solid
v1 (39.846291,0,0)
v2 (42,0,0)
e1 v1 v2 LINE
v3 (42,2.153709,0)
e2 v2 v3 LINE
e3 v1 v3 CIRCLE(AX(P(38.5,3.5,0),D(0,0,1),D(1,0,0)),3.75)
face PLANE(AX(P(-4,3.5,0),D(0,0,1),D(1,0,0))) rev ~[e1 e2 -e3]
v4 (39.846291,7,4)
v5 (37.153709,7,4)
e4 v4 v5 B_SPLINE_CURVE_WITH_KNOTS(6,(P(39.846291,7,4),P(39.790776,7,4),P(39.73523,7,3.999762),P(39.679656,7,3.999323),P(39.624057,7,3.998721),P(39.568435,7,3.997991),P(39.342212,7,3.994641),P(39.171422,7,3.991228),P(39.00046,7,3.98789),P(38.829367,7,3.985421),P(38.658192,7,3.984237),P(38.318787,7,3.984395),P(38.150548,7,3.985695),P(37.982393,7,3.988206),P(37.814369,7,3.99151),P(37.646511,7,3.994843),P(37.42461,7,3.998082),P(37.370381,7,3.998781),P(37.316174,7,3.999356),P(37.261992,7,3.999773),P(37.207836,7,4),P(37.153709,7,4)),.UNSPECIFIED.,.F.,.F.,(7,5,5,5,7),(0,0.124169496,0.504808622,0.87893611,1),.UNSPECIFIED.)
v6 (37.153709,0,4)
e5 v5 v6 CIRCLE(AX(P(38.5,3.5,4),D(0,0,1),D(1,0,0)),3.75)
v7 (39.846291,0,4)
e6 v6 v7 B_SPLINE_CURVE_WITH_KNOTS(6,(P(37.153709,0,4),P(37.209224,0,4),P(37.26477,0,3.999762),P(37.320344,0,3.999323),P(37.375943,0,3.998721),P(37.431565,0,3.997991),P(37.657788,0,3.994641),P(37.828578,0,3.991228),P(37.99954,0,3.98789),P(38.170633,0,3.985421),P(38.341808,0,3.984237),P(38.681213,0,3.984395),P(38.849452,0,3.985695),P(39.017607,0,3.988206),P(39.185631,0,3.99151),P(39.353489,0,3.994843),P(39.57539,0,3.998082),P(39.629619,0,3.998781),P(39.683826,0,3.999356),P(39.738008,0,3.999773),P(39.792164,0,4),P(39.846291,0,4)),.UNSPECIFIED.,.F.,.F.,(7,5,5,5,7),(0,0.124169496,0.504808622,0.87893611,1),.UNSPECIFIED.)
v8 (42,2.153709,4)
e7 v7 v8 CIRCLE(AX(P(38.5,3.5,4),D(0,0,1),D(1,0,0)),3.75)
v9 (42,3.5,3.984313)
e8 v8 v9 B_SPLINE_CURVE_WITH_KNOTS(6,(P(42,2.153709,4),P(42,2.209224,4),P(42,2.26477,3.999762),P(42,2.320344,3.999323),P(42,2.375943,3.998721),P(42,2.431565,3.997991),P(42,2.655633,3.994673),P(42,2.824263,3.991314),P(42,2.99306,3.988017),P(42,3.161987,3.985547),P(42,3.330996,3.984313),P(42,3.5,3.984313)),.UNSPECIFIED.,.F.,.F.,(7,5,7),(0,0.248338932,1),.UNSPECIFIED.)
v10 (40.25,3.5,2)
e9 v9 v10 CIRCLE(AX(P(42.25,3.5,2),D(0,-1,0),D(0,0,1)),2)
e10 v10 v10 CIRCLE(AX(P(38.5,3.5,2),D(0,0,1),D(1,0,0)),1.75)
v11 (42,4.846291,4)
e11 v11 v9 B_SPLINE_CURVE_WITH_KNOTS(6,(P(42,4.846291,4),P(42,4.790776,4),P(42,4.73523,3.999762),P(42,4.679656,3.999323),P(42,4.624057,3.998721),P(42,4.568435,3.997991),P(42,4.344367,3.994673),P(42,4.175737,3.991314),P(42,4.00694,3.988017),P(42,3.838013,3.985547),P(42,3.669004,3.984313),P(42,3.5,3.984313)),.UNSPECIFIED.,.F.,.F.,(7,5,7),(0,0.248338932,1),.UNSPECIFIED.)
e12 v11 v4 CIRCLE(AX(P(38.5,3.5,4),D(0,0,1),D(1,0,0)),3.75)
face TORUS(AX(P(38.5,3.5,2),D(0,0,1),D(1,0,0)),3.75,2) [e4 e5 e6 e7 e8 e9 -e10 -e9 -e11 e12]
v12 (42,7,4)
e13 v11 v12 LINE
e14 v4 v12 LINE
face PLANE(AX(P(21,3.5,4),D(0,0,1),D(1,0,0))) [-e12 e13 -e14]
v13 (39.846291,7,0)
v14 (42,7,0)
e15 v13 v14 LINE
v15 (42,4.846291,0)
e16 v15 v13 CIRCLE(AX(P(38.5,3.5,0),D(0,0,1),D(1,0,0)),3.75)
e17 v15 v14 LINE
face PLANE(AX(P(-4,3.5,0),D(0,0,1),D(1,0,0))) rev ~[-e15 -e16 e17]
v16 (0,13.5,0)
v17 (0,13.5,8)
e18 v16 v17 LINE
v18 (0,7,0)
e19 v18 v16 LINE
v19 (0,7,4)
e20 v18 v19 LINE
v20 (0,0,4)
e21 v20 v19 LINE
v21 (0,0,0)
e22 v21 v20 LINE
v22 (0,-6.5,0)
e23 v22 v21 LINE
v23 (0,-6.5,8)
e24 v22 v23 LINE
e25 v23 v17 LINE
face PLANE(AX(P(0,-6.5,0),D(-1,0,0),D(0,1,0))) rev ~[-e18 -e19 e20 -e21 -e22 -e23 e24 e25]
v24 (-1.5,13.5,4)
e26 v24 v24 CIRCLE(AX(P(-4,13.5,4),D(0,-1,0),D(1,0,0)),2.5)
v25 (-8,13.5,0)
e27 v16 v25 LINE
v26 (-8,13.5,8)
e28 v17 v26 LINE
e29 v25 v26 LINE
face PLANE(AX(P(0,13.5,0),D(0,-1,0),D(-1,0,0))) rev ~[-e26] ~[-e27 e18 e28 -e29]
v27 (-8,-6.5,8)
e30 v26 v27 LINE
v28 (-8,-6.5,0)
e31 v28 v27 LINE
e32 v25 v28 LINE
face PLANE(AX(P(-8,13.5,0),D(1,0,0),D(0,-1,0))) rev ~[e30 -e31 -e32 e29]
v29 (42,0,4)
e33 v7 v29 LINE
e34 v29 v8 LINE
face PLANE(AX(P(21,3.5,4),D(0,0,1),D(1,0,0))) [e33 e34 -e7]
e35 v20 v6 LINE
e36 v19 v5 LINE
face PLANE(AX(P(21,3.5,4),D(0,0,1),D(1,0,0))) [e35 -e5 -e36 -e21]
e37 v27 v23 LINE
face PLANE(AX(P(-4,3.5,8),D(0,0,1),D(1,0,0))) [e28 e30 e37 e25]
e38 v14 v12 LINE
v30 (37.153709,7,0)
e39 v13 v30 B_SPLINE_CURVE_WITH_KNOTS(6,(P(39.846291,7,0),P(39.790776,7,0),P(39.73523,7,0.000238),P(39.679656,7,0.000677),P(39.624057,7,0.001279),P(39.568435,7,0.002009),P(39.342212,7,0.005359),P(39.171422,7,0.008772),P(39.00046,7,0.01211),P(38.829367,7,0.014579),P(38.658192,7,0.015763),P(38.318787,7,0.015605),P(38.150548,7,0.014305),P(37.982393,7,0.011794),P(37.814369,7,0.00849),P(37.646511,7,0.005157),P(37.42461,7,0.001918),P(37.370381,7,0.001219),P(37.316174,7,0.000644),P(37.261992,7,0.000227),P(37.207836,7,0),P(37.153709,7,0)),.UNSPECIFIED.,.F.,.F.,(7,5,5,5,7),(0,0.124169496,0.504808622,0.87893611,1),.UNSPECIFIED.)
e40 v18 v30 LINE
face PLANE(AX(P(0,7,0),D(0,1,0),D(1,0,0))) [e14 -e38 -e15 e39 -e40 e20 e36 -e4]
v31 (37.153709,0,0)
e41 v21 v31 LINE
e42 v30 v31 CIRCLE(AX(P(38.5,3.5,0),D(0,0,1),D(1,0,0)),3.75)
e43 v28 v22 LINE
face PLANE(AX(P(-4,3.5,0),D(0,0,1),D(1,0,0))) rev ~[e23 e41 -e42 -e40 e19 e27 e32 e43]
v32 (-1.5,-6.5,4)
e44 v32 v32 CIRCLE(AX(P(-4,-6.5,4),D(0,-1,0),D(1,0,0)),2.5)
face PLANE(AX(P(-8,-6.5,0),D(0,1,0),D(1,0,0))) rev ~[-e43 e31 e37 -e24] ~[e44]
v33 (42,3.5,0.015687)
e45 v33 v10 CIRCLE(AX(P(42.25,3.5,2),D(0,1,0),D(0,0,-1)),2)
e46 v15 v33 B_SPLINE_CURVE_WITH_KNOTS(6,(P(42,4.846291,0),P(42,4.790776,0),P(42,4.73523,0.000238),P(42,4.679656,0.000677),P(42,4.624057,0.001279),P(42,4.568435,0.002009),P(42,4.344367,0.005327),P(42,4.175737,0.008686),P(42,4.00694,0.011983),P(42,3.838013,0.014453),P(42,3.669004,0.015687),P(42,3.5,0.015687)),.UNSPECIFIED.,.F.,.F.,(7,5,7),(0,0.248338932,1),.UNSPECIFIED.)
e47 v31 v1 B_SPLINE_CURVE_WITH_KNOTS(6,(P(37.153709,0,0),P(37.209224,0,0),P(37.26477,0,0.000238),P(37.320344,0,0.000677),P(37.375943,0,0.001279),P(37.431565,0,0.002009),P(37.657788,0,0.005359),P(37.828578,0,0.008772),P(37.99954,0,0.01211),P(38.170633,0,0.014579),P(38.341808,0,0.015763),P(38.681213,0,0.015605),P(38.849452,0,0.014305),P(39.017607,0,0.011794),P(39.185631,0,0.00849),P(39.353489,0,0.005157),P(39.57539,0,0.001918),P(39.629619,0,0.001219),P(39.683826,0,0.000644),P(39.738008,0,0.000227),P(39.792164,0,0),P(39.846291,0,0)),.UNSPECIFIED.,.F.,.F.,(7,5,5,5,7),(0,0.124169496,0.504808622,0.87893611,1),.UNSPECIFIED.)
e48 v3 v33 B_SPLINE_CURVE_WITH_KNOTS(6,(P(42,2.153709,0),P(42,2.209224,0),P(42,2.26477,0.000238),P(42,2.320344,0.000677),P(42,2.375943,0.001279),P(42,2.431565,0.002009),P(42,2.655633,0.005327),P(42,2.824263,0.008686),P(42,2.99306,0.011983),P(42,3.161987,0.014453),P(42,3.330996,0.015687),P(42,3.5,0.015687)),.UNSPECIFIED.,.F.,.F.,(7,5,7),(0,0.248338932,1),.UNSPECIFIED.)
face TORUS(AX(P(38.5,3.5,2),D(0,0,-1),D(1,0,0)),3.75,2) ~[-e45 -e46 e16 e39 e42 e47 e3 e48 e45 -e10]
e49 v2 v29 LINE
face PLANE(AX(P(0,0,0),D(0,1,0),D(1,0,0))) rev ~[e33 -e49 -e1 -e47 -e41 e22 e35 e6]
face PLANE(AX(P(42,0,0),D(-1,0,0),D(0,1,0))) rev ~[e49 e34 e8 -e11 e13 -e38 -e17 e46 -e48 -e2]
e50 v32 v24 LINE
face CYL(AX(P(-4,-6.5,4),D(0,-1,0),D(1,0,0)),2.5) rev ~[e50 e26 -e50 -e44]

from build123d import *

# Parameters (mm, degrees)
F1_DEPTH = 8
F0_W     = 42
F0_H     = 7
F0_R     = 1.75
F2_DEPTH = 4
F4_R     = 2.5
F5_DEPTH = 20.001


# Not quite as in the source:
# - a fillet or chamfer that OpenCascade refuses, or shapes differently, is made with other operations: its cross-section is extruded or revolved along the edge and cut away or added


with BuildPart() as f1:
    # F0 (on Top) → F1 (new body)
    with BuildSketch(Plane.XY):
        Polygon((0, -6.5), (0, 0), (0, 7), (0, 13.5), (-8, 13.5), (-8, -6.5), align=None)
    extrude(amount=F1_DEPTH)

    # F0 (on Top) → F2 (join)
    with BuildSketch(Plane.XY):
        with Locations((21, 3.5)):
            Rectangle(F0_W, F0_H)
        with Locations((38.5, 3.5)):
            Circle(F0_R, mode=Mode.SUBTRACT)
    extrude(amount=F2_DEPTH)

    # F3: fillet of radius 2 on 2 edges, made by hand

    # F3_s1 → F3_t2 (revolve, cut)
    with BuildSketch(Plane.XZ.offset(-3.5)):
        with BuildLine():
            ThreePointArc((42.25, 4), (40.8357864376, 3.4142135624), (40.25, 2))
            Line((40.25, 2), (40.25, 4))
            Line((40.25, 4), (42.25, 4))
        make_face()
    revolve(axis=Axis((38.5, 3.5, 4), (0, 0, 1)), mode=Mode.SUBTRACT)

    # F3_s3 → F3_t4 (revolve, cut)
    with BuildSketch(Plane.XZ.offset(-3.5)):
        with BuildLine():
            ThreePointArc((42.25, 0), (40.8357864376, 0.5857864376), (40.25, 2))
            Line((40.25, 2), (40.25, 0))
            Line((40.25, 0), (42.25, 0))
        make_face()
    revolve(axis=Axis((38.5, 3.5, 0), (0, 0, 1)), mode=Mode.SUBTRACT)

    # F4 (on face) → F5 (cut, through all)
    with BuildSketch(Plane.XZ.offset(6.5)):
        with Locations((-4, 4)):
            Circle(F4_R)
    extrude(amount=-F5_DEPTH, mode=Mode.SUBTRACT)


solid = f1.part
